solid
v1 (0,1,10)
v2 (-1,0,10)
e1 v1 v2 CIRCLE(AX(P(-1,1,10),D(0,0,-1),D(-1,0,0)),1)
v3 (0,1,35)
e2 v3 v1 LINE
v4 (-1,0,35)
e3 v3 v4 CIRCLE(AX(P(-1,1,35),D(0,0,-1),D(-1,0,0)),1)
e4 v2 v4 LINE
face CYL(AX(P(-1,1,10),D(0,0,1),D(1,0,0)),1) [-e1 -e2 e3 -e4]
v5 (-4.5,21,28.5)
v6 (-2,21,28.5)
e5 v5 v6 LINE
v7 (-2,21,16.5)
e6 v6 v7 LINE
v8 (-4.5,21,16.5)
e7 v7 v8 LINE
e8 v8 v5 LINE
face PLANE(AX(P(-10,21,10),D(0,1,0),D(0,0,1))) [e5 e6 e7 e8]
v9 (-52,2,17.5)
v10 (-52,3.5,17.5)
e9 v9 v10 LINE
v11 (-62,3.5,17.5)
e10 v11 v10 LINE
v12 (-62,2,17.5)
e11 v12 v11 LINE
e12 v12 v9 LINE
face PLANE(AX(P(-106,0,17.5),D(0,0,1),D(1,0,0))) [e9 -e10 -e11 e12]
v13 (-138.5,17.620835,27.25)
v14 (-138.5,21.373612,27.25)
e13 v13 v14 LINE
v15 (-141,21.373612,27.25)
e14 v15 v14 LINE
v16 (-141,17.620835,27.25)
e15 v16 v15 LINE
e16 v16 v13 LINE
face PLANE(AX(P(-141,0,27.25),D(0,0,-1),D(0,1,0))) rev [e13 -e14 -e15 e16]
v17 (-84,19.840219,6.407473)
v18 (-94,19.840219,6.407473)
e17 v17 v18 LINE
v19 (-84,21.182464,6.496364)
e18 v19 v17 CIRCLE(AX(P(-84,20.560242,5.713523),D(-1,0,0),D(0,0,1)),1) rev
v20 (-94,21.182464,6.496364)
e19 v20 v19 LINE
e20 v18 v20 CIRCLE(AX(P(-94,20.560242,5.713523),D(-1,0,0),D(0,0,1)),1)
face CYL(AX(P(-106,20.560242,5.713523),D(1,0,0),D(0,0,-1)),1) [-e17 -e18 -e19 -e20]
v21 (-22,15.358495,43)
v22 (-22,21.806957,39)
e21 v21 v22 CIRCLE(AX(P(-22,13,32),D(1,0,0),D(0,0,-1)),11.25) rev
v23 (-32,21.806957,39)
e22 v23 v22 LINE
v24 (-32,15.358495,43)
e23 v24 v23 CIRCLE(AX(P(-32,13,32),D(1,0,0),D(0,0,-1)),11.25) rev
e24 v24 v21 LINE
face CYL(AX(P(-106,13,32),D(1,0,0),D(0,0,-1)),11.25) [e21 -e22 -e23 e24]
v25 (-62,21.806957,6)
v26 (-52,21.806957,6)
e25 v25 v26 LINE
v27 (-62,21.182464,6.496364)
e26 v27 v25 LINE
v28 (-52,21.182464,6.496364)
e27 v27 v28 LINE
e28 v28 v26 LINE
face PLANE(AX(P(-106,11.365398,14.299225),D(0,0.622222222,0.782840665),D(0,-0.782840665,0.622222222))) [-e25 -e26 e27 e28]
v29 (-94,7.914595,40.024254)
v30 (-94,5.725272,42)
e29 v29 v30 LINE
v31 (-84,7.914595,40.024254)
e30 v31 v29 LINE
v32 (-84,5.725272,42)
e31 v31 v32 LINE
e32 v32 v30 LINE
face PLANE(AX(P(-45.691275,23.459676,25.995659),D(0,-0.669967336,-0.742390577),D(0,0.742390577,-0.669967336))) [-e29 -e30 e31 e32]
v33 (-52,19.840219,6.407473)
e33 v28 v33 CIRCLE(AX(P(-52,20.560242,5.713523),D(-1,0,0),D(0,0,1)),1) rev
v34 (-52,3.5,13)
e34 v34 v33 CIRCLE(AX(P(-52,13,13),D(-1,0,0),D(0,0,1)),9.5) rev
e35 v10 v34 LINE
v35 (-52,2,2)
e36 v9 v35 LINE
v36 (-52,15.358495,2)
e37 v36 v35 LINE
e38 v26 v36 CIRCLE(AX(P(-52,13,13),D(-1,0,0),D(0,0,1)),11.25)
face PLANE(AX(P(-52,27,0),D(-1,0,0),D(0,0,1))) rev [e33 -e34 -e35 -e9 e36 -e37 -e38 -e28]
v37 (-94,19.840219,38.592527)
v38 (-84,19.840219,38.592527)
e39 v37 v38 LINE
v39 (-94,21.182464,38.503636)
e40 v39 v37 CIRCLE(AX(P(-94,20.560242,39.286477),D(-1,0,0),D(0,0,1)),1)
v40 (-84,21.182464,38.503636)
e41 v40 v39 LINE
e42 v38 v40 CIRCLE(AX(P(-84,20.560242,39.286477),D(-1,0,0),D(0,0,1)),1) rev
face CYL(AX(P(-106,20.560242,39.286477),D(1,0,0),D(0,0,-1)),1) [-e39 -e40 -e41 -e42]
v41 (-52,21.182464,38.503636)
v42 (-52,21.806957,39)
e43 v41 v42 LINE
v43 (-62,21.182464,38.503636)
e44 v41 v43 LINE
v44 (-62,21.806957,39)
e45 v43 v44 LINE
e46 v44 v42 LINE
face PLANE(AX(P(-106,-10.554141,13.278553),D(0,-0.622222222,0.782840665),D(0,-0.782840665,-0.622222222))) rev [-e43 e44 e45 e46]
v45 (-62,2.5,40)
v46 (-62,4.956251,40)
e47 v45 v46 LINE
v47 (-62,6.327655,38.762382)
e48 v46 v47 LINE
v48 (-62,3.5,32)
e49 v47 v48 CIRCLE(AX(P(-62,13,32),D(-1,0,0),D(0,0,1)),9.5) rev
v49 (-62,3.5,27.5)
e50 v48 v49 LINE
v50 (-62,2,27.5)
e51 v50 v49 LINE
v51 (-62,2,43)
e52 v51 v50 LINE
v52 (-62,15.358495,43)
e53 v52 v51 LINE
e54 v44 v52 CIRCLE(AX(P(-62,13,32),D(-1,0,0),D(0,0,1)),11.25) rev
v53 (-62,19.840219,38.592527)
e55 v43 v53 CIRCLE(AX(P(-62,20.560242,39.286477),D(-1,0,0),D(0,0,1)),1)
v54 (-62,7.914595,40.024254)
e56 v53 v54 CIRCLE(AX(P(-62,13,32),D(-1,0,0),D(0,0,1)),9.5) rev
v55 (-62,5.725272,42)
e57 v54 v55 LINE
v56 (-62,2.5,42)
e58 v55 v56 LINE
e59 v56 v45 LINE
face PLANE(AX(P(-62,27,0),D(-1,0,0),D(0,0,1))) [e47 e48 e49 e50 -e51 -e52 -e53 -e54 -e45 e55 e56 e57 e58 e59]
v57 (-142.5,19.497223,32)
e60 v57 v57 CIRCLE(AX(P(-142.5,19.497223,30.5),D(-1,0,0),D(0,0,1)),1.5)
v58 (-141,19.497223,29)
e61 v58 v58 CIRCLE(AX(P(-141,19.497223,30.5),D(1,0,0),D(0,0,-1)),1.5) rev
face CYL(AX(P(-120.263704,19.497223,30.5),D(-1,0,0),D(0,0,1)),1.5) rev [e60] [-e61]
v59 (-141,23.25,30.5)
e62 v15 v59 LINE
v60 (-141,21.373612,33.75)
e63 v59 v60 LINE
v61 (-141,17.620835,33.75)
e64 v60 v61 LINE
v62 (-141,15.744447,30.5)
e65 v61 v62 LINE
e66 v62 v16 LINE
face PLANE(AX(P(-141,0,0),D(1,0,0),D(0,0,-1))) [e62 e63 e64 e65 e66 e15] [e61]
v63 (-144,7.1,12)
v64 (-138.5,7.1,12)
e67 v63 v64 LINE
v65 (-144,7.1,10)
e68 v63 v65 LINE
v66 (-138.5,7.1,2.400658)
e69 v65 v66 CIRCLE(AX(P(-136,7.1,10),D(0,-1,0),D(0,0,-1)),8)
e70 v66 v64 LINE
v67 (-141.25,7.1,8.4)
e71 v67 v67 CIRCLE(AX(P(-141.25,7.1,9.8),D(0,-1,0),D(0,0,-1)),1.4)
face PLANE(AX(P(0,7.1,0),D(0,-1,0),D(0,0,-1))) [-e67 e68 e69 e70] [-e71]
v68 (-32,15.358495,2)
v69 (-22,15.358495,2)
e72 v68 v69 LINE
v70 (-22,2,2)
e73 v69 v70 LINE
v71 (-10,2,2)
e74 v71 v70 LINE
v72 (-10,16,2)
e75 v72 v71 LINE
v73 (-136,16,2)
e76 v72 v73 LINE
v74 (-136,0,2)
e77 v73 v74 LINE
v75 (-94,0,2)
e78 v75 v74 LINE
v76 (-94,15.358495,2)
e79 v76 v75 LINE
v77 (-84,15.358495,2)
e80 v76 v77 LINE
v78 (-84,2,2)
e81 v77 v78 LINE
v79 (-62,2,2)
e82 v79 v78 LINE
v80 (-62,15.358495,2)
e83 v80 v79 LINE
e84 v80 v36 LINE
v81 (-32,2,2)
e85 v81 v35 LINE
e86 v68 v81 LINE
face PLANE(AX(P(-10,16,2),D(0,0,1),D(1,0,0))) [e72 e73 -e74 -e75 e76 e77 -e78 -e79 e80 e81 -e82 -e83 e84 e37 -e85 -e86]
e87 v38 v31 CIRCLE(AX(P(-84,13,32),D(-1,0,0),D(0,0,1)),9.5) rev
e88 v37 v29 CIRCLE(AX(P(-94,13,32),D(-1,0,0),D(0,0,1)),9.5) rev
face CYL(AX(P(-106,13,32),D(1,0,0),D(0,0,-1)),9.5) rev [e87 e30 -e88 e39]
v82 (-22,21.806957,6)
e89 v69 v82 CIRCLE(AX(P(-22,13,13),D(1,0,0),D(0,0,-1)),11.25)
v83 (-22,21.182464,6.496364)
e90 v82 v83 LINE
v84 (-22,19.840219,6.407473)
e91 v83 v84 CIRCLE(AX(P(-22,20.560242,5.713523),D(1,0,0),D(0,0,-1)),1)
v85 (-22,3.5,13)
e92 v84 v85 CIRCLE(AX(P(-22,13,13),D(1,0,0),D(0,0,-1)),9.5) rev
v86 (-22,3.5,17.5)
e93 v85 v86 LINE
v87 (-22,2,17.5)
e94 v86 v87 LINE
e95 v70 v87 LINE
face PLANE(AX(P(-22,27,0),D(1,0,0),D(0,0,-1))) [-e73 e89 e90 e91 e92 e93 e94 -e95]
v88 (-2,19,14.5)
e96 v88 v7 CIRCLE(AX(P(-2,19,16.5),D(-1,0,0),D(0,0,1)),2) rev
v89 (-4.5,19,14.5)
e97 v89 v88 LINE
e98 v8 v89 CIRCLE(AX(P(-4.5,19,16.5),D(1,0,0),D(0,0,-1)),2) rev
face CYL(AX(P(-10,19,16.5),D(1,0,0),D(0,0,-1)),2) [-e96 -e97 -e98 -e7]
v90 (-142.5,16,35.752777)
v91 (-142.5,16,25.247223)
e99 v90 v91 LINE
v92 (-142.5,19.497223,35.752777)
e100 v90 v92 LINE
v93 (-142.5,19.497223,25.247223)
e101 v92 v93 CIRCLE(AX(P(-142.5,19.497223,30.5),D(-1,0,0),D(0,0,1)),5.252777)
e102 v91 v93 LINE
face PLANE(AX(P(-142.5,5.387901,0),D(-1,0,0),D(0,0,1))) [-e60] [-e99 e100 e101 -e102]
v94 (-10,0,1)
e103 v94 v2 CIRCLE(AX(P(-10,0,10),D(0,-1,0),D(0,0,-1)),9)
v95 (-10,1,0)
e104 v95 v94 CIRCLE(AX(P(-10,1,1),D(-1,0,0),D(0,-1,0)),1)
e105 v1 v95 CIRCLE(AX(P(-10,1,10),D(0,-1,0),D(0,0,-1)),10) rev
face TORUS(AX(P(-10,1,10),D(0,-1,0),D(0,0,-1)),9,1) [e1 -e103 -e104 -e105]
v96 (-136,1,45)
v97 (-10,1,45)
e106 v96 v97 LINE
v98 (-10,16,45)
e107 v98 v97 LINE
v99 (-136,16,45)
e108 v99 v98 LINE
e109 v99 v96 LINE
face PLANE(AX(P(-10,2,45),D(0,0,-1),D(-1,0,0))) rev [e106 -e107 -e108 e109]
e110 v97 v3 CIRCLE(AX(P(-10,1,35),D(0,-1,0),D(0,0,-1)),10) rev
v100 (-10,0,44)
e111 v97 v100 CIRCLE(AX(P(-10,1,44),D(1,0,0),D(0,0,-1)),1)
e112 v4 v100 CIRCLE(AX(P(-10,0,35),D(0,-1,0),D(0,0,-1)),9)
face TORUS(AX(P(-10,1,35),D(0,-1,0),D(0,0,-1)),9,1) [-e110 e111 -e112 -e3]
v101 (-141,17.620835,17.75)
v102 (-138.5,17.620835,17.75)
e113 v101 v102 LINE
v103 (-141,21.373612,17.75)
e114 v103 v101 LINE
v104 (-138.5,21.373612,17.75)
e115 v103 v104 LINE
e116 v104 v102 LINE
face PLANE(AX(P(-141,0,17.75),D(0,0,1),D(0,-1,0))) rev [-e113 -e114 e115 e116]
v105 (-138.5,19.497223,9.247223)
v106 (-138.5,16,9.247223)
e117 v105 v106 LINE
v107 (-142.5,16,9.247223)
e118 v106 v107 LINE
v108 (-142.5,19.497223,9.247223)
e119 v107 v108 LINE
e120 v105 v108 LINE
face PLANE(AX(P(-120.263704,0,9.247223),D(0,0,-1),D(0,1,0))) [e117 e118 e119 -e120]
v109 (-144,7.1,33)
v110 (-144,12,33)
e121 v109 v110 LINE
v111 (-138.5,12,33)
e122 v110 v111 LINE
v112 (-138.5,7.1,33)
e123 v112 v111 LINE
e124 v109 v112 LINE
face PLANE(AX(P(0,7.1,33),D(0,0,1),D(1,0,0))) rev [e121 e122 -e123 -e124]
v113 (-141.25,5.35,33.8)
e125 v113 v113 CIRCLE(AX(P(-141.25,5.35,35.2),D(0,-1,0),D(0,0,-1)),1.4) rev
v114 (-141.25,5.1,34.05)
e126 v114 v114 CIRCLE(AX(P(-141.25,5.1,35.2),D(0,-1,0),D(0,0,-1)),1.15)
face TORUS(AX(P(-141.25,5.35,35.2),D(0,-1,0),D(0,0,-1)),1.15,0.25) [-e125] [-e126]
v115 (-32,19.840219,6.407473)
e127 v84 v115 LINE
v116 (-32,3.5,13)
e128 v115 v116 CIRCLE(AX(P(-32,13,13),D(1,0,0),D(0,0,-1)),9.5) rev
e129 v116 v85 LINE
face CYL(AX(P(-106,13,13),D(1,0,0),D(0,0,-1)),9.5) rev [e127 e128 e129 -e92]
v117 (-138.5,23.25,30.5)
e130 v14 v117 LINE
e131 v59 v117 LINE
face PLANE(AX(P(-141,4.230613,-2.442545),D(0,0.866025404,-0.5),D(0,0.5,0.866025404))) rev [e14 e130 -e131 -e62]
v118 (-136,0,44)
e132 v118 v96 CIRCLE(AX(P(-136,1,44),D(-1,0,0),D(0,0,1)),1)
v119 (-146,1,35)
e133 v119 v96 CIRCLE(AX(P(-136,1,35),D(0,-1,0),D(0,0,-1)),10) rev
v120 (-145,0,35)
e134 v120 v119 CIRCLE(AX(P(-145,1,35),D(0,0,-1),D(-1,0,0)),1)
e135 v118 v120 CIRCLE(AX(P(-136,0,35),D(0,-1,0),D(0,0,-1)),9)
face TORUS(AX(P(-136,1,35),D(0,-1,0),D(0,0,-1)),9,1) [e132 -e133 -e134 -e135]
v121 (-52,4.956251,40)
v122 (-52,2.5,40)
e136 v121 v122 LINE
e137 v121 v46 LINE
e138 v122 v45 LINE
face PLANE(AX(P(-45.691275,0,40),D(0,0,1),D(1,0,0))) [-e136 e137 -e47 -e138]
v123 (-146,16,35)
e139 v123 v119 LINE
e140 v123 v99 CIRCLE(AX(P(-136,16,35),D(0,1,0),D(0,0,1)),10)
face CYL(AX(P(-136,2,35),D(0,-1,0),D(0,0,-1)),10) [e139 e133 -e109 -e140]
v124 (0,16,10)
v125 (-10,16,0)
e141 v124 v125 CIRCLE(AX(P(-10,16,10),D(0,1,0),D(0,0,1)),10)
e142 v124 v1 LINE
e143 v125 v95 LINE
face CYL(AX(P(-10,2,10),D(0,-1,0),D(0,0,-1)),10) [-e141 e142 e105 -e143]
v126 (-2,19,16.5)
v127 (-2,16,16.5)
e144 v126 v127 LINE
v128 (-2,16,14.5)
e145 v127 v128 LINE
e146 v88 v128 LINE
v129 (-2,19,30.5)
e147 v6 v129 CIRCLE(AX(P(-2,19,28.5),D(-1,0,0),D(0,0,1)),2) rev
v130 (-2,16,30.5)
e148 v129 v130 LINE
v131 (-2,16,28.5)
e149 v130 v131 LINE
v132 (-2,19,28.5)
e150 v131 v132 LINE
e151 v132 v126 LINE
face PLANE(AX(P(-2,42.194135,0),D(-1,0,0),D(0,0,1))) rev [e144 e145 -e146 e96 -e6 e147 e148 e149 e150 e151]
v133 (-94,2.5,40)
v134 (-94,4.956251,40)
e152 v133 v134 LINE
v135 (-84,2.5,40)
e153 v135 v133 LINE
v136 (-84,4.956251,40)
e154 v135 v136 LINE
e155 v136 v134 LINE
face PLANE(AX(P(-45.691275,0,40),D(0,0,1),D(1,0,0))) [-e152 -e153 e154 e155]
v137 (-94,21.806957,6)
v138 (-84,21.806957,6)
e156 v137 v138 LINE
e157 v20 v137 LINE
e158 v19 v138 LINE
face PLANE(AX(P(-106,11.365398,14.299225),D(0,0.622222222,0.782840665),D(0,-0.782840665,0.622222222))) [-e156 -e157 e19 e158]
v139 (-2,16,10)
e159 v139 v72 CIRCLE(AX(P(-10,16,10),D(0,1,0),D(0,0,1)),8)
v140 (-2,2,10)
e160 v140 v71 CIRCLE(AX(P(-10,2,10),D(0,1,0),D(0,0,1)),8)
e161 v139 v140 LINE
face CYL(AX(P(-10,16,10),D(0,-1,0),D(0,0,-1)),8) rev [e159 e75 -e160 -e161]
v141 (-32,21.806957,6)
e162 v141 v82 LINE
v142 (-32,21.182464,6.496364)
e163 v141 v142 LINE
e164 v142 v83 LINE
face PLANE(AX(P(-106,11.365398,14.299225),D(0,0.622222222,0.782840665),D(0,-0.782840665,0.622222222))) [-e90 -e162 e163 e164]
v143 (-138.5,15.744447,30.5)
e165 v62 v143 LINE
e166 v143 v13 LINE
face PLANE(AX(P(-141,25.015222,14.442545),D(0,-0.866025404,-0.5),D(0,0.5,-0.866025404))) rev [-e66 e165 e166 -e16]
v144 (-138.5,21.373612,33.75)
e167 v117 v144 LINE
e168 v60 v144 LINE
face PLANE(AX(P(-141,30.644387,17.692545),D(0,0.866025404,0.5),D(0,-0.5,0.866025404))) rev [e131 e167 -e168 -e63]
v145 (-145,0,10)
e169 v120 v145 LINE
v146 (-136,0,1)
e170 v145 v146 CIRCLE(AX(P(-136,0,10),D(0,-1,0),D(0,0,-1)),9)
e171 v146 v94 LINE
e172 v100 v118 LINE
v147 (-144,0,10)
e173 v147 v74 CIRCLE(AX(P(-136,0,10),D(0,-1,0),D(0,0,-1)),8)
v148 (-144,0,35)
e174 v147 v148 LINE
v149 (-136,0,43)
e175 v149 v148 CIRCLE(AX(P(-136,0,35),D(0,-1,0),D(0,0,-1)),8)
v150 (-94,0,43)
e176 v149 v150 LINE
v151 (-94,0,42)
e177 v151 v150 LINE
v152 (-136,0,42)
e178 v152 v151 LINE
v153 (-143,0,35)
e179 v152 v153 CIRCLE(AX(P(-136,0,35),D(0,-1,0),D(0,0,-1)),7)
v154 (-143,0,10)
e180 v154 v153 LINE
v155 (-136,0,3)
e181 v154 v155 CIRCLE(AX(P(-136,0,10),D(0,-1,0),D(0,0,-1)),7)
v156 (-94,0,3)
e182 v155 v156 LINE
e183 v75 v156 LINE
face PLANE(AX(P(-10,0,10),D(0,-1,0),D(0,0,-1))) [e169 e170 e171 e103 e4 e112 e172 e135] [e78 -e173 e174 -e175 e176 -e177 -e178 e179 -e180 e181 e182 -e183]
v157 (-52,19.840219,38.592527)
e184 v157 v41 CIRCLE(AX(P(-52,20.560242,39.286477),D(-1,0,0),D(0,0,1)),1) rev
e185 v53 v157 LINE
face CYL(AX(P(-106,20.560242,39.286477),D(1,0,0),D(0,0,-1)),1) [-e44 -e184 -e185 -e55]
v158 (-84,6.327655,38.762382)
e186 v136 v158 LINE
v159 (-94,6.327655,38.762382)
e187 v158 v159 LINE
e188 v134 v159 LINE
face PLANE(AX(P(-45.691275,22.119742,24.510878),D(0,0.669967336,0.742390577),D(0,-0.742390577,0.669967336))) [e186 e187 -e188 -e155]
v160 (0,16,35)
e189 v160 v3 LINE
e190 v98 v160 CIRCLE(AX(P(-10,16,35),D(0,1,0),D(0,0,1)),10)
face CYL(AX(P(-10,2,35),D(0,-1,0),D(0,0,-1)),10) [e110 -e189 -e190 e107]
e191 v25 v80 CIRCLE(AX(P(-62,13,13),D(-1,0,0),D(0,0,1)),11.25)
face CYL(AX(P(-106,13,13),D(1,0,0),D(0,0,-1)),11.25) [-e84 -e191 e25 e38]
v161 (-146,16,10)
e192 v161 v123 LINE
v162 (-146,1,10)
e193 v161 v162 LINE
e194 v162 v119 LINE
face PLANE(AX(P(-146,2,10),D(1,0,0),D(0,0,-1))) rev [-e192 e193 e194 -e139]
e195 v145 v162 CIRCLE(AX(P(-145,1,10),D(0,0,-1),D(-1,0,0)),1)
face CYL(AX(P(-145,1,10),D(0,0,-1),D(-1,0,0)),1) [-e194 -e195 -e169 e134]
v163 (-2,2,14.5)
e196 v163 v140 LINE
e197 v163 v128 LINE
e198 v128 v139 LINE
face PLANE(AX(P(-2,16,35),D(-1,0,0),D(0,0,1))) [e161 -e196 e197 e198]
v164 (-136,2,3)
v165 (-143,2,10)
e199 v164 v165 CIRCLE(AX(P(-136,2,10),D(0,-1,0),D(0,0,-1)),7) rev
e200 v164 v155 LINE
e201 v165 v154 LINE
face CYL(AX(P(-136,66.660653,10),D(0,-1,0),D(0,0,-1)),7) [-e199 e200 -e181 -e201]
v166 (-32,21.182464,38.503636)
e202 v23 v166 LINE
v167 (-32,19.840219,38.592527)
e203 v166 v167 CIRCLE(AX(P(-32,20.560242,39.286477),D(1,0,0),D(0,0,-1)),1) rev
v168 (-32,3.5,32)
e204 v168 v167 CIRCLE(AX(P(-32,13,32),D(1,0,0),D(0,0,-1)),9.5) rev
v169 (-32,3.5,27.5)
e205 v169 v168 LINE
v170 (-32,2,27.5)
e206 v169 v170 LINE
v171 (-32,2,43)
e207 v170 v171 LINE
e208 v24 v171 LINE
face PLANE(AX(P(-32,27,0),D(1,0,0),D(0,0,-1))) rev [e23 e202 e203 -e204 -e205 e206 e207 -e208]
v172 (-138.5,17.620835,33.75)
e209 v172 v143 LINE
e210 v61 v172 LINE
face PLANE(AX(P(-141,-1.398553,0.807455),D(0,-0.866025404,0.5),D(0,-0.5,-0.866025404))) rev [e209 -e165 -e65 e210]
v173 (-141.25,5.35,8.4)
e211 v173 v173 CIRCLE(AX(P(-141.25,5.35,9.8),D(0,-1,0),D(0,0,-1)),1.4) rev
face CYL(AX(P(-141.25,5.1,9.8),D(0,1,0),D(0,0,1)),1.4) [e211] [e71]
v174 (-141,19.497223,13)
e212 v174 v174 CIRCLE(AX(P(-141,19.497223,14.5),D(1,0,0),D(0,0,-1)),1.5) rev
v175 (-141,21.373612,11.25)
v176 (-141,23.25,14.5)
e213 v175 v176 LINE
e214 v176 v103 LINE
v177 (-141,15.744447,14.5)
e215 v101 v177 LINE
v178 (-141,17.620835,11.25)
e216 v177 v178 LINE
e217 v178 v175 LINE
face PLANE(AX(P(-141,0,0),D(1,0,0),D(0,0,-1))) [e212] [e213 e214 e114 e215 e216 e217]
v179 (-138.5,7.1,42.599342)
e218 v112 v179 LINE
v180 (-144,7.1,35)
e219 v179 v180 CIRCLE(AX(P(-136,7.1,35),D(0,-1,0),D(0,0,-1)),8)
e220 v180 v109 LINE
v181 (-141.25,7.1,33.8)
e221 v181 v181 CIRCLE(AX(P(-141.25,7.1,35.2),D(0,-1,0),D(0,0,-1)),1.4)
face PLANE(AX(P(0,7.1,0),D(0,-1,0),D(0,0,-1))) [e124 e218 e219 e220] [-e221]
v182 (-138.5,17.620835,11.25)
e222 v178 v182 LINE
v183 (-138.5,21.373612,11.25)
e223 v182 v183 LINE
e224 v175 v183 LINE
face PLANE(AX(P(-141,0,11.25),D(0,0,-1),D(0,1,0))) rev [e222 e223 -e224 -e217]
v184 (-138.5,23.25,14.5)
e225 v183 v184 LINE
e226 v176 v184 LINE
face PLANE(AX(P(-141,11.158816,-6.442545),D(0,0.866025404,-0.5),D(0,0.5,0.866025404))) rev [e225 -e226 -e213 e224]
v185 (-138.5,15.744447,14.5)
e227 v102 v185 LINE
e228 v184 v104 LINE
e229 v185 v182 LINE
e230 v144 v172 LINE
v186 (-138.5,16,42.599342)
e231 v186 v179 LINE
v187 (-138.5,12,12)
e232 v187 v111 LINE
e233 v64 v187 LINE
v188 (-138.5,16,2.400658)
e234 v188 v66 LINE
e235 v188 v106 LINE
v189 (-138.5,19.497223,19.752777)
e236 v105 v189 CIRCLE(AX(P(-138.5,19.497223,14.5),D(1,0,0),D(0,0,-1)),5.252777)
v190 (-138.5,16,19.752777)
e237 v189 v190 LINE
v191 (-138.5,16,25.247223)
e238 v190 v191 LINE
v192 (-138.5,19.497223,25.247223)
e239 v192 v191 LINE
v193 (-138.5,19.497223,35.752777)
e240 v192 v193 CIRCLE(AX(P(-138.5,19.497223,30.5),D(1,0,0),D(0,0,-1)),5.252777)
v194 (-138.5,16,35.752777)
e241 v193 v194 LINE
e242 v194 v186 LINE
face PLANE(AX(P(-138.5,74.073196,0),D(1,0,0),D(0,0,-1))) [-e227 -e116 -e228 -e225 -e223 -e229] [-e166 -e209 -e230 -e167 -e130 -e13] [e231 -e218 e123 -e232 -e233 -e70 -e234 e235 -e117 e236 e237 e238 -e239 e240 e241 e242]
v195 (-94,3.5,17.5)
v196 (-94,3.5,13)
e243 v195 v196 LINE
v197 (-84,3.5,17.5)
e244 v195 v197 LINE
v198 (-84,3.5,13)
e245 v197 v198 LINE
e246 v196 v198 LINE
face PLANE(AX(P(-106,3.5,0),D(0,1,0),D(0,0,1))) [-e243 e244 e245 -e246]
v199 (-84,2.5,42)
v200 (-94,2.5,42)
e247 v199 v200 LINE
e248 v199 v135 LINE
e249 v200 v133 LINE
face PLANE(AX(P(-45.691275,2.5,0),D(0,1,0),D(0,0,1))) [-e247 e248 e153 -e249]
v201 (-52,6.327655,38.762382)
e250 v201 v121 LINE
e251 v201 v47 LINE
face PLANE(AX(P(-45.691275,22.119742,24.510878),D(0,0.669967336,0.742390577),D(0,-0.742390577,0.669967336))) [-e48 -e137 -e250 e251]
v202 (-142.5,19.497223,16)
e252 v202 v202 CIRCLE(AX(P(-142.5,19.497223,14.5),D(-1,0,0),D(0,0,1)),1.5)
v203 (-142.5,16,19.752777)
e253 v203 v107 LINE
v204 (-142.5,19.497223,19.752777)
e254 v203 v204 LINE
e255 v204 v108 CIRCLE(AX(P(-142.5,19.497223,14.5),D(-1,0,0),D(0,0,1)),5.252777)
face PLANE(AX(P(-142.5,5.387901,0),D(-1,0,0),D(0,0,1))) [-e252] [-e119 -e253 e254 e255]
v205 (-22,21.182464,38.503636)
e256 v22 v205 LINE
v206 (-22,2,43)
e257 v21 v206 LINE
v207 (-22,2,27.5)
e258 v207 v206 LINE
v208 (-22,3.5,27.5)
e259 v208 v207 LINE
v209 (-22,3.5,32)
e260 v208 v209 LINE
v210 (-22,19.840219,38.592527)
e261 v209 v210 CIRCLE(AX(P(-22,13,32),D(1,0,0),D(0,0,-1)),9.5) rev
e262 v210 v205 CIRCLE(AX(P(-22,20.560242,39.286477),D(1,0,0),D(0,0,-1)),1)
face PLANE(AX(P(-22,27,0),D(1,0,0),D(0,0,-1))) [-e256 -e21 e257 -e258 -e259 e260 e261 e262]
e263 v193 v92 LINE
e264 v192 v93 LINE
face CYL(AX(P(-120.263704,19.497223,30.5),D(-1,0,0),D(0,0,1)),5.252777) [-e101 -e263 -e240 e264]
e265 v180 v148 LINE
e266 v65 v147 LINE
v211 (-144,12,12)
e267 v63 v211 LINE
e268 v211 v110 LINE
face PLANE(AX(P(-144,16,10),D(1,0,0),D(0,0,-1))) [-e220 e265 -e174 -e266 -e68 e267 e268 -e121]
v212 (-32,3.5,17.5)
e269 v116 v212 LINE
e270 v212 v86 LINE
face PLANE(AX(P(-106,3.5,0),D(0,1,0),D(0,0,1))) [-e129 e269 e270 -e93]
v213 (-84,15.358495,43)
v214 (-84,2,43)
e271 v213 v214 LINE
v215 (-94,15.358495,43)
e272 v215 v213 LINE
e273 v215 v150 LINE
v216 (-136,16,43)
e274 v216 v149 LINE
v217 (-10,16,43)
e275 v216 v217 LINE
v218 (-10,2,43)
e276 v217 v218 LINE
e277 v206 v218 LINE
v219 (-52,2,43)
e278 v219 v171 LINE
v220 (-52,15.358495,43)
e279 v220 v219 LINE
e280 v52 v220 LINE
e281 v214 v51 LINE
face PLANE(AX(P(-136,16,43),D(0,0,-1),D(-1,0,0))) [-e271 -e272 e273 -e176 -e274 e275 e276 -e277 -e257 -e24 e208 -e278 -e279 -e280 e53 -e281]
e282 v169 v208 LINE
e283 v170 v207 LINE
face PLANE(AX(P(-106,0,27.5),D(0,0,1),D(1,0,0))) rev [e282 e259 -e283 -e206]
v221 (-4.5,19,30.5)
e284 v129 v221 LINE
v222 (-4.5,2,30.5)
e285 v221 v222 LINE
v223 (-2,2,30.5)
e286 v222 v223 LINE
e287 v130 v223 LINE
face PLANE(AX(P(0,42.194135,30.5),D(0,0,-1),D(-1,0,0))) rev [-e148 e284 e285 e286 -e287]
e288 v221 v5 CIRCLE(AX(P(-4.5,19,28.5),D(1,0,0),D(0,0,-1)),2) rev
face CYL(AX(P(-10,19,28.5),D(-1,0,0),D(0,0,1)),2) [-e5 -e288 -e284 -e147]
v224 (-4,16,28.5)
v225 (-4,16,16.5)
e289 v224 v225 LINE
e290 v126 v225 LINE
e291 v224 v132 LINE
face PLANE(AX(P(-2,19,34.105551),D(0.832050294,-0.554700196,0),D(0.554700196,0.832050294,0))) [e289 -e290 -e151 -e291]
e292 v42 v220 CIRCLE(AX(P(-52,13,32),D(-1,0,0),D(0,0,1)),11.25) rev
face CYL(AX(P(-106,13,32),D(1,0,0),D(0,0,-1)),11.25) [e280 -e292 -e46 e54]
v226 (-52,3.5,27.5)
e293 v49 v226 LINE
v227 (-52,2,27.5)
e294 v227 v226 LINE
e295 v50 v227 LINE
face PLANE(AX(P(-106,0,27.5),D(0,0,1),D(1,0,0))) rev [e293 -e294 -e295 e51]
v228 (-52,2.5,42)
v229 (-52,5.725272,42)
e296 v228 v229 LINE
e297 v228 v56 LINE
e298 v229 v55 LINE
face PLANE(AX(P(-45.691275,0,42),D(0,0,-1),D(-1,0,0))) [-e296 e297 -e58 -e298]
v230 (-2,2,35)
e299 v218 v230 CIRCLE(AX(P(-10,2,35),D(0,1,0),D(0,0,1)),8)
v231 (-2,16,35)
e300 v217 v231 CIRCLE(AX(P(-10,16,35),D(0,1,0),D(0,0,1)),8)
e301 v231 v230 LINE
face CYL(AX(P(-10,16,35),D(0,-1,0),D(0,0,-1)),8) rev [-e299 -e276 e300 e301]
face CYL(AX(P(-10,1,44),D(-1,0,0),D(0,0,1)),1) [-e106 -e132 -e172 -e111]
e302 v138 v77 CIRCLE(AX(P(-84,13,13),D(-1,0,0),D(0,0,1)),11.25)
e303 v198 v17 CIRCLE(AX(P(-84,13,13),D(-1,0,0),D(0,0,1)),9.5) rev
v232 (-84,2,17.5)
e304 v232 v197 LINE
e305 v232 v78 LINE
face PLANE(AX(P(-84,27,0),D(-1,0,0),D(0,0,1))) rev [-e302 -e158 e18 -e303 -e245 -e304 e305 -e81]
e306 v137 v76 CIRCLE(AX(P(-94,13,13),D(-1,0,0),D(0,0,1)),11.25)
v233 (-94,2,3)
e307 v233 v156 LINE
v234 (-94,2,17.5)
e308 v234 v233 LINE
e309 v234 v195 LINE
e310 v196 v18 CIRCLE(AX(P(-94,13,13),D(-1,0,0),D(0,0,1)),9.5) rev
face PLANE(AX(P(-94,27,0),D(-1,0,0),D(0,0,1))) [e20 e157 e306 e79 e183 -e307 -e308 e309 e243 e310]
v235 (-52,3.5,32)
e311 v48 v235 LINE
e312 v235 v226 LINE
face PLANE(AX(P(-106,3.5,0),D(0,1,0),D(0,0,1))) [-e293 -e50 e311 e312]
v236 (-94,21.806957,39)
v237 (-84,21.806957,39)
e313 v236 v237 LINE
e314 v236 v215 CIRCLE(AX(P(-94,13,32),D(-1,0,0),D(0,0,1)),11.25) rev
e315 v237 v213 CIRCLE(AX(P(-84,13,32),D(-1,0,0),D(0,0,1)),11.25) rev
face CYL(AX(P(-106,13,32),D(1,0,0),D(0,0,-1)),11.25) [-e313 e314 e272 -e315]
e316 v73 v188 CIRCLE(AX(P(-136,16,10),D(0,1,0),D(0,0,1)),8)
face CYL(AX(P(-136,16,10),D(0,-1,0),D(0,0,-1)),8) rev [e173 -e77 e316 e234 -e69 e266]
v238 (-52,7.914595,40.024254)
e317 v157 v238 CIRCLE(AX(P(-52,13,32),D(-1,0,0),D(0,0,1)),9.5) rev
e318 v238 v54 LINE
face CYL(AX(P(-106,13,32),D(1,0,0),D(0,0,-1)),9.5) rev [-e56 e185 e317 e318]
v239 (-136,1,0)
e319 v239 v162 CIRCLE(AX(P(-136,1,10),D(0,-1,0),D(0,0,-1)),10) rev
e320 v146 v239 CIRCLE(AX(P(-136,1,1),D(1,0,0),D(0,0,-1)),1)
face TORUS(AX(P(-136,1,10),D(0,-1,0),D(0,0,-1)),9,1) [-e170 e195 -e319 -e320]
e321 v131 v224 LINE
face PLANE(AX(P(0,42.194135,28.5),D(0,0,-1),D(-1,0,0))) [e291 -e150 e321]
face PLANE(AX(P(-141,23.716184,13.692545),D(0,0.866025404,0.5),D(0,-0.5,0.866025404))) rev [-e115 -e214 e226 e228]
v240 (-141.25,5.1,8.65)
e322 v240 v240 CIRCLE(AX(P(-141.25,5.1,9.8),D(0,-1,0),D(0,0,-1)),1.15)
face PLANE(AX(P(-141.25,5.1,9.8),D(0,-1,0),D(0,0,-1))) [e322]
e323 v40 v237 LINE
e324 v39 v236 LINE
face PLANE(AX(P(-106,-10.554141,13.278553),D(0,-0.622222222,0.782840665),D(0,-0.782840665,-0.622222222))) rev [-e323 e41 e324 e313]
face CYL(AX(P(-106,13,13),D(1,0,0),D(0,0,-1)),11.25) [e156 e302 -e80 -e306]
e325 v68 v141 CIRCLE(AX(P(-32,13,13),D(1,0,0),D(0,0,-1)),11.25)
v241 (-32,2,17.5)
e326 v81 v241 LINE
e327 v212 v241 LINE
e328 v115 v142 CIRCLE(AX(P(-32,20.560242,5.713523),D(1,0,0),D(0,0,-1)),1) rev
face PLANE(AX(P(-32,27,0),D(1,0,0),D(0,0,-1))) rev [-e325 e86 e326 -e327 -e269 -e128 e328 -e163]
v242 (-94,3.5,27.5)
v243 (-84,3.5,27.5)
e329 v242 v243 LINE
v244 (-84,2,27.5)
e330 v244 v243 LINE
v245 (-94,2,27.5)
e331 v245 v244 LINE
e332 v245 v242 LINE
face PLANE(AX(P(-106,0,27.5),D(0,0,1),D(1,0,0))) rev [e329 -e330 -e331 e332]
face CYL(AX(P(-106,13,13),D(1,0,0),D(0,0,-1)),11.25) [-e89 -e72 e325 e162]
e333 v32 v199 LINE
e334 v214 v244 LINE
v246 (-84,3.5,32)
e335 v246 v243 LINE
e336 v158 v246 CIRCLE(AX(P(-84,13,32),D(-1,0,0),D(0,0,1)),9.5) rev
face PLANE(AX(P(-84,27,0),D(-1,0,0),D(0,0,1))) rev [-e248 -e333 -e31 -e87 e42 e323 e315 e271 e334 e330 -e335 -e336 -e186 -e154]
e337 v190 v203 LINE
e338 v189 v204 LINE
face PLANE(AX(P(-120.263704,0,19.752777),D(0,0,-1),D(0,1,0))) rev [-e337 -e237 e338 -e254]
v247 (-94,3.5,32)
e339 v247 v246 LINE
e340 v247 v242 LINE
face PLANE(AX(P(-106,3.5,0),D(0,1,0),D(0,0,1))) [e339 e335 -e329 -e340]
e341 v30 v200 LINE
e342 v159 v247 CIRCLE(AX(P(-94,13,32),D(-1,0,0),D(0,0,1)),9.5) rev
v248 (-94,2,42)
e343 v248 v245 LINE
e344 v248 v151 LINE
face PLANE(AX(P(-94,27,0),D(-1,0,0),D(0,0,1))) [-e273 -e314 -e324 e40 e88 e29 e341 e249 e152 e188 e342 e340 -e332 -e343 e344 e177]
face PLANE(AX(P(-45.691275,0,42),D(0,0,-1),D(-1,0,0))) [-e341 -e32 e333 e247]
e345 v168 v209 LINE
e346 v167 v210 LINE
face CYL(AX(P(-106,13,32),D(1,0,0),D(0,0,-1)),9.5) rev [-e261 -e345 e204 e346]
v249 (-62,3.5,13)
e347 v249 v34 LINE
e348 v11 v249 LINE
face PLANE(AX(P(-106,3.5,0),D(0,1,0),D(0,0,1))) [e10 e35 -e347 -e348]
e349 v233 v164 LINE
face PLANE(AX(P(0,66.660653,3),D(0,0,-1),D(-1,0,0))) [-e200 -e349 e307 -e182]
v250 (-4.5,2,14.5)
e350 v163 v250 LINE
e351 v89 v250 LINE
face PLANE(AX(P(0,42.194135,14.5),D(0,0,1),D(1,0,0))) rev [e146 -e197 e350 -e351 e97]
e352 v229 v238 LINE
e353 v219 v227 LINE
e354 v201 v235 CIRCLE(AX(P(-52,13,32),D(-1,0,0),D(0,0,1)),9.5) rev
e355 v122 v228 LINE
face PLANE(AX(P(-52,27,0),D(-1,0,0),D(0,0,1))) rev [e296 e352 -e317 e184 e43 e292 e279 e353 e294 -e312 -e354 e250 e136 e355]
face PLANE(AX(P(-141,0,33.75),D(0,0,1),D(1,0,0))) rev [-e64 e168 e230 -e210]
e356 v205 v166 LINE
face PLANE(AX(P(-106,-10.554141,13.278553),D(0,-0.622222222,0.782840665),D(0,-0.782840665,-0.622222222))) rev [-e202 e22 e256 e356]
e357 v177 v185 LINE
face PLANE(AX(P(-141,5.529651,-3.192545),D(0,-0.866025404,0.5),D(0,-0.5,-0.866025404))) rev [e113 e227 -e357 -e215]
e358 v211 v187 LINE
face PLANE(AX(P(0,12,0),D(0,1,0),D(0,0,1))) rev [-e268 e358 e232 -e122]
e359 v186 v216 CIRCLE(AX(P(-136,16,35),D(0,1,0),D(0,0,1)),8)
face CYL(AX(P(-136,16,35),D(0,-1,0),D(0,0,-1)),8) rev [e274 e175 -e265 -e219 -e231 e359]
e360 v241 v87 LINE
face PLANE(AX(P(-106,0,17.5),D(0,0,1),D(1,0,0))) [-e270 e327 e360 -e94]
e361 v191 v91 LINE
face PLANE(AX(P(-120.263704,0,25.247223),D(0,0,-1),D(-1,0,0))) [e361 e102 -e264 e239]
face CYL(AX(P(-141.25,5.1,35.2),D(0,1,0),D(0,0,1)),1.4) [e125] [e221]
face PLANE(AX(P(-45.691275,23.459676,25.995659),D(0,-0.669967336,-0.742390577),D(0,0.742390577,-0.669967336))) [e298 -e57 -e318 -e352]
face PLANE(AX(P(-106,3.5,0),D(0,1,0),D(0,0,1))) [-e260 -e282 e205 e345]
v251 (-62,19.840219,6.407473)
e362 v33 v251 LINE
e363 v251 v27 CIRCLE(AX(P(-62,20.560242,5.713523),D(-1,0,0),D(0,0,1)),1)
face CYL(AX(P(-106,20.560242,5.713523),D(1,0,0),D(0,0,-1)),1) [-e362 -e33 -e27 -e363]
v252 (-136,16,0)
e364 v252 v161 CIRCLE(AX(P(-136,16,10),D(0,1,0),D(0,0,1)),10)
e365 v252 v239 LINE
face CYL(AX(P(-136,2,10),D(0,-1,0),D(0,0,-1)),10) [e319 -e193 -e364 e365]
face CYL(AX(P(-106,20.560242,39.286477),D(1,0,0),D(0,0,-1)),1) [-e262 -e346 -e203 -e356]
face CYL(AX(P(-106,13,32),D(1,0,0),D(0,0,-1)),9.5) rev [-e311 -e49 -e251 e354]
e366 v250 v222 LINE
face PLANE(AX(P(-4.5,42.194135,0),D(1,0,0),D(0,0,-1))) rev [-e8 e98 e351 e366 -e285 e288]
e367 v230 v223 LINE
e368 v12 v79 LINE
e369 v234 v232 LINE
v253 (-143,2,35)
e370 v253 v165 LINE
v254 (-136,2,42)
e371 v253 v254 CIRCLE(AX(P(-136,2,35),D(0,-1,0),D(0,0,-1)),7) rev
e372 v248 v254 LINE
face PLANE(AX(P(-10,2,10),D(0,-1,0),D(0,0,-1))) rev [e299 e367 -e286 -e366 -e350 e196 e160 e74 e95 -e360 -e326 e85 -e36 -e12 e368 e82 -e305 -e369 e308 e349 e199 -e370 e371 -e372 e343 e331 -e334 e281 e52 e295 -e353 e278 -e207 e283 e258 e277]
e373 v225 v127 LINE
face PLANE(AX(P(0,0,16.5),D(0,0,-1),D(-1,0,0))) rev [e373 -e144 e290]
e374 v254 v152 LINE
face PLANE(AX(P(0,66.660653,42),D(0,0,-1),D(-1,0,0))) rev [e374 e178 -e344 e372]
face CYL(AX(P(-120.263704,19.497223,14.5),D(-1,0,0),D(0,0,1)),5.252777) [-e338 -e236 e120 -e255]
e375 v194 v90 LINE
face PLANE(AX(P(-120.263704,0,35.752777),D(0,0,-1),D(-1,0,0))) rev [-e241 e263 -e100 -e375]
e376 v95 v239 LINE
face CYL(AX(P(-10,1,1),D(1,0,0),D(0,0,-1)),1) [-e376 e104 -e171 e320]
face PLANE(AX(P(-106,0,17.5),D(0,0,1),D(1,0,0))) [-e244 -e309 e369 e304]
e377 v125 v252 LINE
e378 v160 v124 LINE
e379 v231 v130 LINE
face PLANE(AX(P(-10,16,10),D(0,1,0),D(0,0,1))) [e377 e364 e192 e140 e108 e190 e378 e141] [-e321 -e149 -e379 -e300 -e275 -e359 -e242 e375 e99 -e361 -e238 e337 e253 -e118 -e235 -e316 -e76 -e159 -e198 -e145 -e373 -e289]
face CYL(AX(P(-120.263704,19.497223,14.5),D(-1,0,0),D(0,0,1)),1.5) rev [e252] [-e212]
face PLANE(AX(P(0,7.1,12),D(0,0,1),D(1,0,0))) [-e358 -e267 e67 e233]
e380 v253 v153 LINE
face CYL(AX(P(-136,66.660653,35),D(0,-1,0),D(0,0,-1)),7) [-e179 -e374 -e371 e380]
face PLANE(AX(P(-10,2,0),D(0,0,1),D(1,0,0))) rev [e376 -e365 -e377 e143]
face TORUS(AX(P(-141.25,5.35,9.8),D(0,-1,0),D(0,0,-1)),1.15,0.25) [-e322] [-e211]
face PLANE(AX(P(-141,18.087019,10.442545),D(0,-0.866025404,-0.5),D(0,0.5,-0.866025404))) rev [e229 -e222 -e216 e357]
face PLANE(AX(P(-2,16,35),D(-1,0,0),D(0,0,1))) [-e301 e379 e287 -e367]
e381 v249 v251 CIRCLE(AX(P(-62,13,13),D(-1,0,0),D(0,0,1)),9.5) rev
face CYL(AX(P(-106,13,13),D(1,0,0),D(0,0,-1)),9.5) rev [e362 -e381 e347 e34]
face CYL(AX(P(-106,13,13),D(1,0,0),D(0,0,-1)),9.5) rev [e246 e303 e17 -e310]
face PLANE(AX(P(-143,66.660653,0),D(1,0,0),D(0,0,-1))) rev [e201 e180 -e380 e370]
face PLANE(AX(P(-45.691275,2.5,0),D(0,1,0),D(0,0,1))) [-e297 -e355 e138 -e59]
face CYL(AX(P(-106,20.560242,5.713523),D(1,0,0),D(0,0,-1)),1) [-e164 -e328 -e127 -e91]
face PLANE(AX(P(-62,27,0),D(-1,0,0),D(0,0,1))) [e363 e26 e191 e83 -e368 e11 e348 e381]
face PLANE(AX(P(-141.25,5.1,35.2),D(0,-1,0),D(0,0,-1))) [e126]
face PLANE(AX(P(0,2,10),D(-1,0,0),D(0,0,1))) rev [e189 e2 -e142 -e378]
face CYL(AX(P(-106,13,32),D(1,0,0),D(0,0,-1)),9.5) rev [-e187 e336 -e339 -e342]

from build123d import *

# Parameters (mm, degrees)
BOSS_EXTRUDE1_DEPTH    = 2
BOSS_EXTRUDE2_DEPTH    = 14
FILLET1_R              = 1
SKETCH3_W              = 10
SKETCH3_H              = 41
BOSS_EXTRUDE3_DEPTH    = 25
BOSS_EXTRUDE5_DEPTH    = 12.75
CUT_EXTRUDE3_DEPTH     = 2.5
CUT_EXTRUDE5_OUTLINE_R = 1.5
CUT_EXTRUDE5_DEPTH     = 5.5
SKETCH10_W             = 2.5
SKETCH10_H             = 16
BOSS_EXTRUDE6_DEPTH    = 19
CUT_EXTRUDE6_DEPTH     = 12
FILLET2_R              = 2
CUT_EXTRUDE7_START     = -8.75
CUT_EXTRUDE7_DEPTH     = 8.75
CUT_EXTRUDE13_DEPTH    = 84
CUT_EXTRUDE15_DEPTH    = 2
BOSS_EXTRUDE7_START    = 4.9
BOSS_EXTRUDE7_DEPTH    = 4.9
SKETCH17_R             = 1.4
BOSS_EXTRUDE8_DEPTH    = 2
FILLET3_R              = 0.25
CUT_EXTRUDE16_START    = -42
CUT_EXTRUDE16_DEPTH    = 42
FILLET4_R              = 1


# Read off the part's stored shape, not the designer's step: Cut-Extrude5
with BuildPart() as part:
    # Sketch1 → Boss-Extrude1 (new body)
    with BuildSketch(Plane(origin=(0, 0, 0), x_dir=(1, 0, 0), z_dir=(0, 1, 0))):
        with BuildLine():
            Line((-10, 0), (-136, 0))
            ThreePointArc((-136, 0), (-143.071067812, -2.928932188), (-146, -10))
            Line((-146, -10), (-146, -35))
            ThreePointArc((-146, -35), (-143.071067812, -42.071067812), (-136, -45))
            Line((-136, -45), (-10, -45))
            ThreePointArc((-10, -45), (-2.928932188, -42.071067812), (0, -35))
            Line((0, -35), (0, -10))
            ThreePointArc((0, -10), (-2.928932188, -2.928932188), (-10, 0))
        make_face()
    extrude(amount=BOSS_EXTRUDE1_DEPTH)

    # Sketch2 → Boss-Extrude2 (add)
    with BuildSketch(Plane(origin=(0, 2, 0), x_dir=(1, 0, 0), z_dir=(0, 1, 0))):
        with BuildLine():
            Line((-10, 0), (-136, 0))
            ThreePointArc((-136, 0), (-143.071067812, -2.928932188), (-146, -10))
            Line((-146, -10), (-146, -35))
            ThreePointArc((-146, -35), (-143.071067812, -42.071067812), (-136, -45))
            Line((-136, -45), (-10, -45))
            ThreePointArc((-10, -45), (-2.928932188, -42.071067812), (0, -35))
            Line((0, -35), (0, -10))
            ThreePointArc((0, -10), (-2.928932188, -2.928932188), (-10, 0))
        make_face()
        with BuildLine():
            Line((-10, -2), (-136, -2))
            ThreePointArc((-136, -2), (-141.656854249, -4.343145751), (-144, -10))
            Line((-144, -10), (-144, -35))
            ThreePointArc((-144, -35), (-141.656854249, -40.656854249), (-136, -43))
            Line((-136, -43), (-10, -43))
            ThreePointArc((-10, -43), (-4.343145751, -40.656854249), (-2, -35))
            Line((-2, -35), (-2, -10))
            ThreePointArc((-2, -10), (-4.343145751, -4.343145751), (-10, -2))
        make_face(mode=Mode.SUBTRACT)
    extrude(amount=BOSS_EXTRUDE2_DEPTH)

    # Fillet1
    fillet1_edges = [part.edges().sort_by_distance(p)[0] for p in [
        (-73, 0, 0),
        (-2.928932188, 0, 2.928932188),
        (0, 0, 22.5),
        (-2.928932188, 0, 42.071067812),
        (-73, 0, 45),
        (-143.071067812, 0, 42.071067812),
        (-146, 0, 22.5),
        (-143.071067812, 0, 2.928932188),
    ]]
    fillet(fillet1_edges, radius=FILLET1_R)

    # Sketch3 → Boss-Extrude3 (add)
    with BuildSketch(Plane(origin=(0, 2, 0), x_dir=(1, 0, 0), z_dir=(0, 1, 0))):
        with Locations((-57, -22.5)):
            Rectangle(SKETCH3_W, SKETCH3_H)
        with Locations((-89, -22.5)):
            Rectangle(SKETCH3_W, SKETCH3_H)
        with Locations((-27, -22.5)):
            Rectangle(SKETCH3_W, SKETCH3_H)
    extrude(amount=BOSS_EXTRUDE3_DEPTH)

    # Sketch7 → Boss-Extrude5 (add)
    with BuildSketch(Plane(origin=(0, 12, 0), x_dir=(1, 0, 0), z_dir=(0, 1, 0))):
        with BuildLine():
            ThreePointArc((-138.5, -2.400657923), (-142.480740698, -5.30958424), (-144, -10))
            Line((-144, -10), (-144, -35))
            ThreePointArc((-144, -35), (-142.480740698, -39.69041576), (-138.5, -42.599342077))
            Line((-138.5, -42.599342077), (-138.5, -2.400657923))
        make_face()
    extrude(amount=BOSS_EXTRUDE5_DEPTH)

    # Sketch8 → Cut-Extrude3 (cut)
    with BuildSketch(Plane(origin=(-138.5, 0, 0), x_dir=(0, 0, -1), z_dir=(1, 0, 0))):
        Polygon((-27.25, 17.620834875), (-27.25, 21.373611625), (-30.5, 23.25), (-33.75, 21.373611625), (-33.75, 17.620834875), (-30.5, 15.744446501), align=None)
        Polygon((-11.25, 17.620834875), (-11.25, 21.373611625), (-14.5, 23.25), (-17.75, 21.373611625), (-17.75, 17.620834875), (-14.5, 15.744446501), align=None)
    extrude(amount=-CUT_EXTRUDE3_DEPTH, mode=Mode.SUBTRACT)

    # Cut-Extrude5 outline → Cut-Extrude5 (cut)
    with BuildSketch(Plane(origin=(-144, 0, 0), x_dir=(0, 0, -1), z_dir=(1, 0, 0))):
        with BuildLine():
            Line((-2.400657923, 24.75), (-14.500000003, 24.75))
            ThreePointArc((-14.500000003, 24.75), (-10.785725941, 23.211497311), (-9.24722325, 19.49722325))
            Line((-9.24722325, 19.49722325), (-9.24722325, 16))
            Line((-9.24722325, 16), (-2.400657923, 16))
            Line((-2.400657923, 16), (-2.400657923, 24.75))
        make_face()
        with BuildLine():
            ThreePointArc((-19.75277675, 19.49722325), (-18.214274061, 23.211497309), (-14.500000003, 24.75))
            Line((-14.500000003, 24.75), (-30.49999999, 24.75))
            ThreePointArc((-30.49999999, 24.75), (-26.785725937, 23.211497307), (-25.24722325, 19.49722325))
            Line((-25.24722325, 19.49722325), (-25.24722325, 16))
            Line((-25.24722325, 16), (-19.75277675, 16))
            Line((-19.75277675, 16), (-19.75277675, 19.49722325))
        make_face()
        with BuildLine():
            ThreePointArc((-35.75277675, 19.49722325), (-34.214274056, 23.211497313), (-30.49999999, 24.75))
            Line((-30.49999999, 24.75), (-42.599342077, 24.75))
            Line((-42.599342077, 24.75), (-42.599342077, 16))
            Line((-42.599342077, 16), (-35.75277675, 16))
            Line((-35.75277675, 16), (-35.75277675, 19.49722325))
        make_face()
        with Locations((-14.5, 19.49722325)):
            Circle(CUT_EXTRUDE5_OUTLINE_R)
        with Locations((-30.5, 19.49722325)):
            Circle(CUT_EXTRUDE5_OUTLINE_R)
    extrude(amount=CUT_EXTRUDE5_DEPTH, mode=Mode.SUBTRACT)

    # Sketch10 → Boss-Extrude6 (add)
    with BuildSketch(Plane(origin=(0, 2, 0), x_dir=(1, 0, 0), z_dir=(0, 1, 0))):
        with Locations((-3.25, -22.5)):
            Rectangle(SKETCH10_W, SKETCH10_H)
    extrude(amount=BOSS_EXTRUDE6_DEPTH)

    # Sketch11 → Cut-Extrude6 (cut)
    with BuildSketch(Plane(origin=(0, 0, 16.5), x_dir=(-1, 0, 0), z_dir=(0, 0, -1))):
        Polygon((2, 19), (4, 16), (2, 16), align=None)
    extrude(amount=-CUT_EXTRUDE6_DEPTH, mode=Mode.SUBTRACT)

    # Fillet2
    fillet2_edges = [part.edges().sort_by_distance(p)[0] for p in [
        (-3.25, 21, 14.5),
        (-3.25, 21, 30.5),
    ]]
    fillet(fillet2_edges, radius=FILLET2_R)

    # Sketch12 → Cut-Extrude7 (cut)
    with BuildSketch(Plane(origin=(0, 24.75, 0), x_dir=(1, 0, 0), z_dir=(0, 1, 0)).offset(CUT_EXTRUDE7_START)):
        with BuildLine():
            ThreePointArc((-143.964504201, -9.24722325), (-143.991121123, -9.623193423), (-144, -10))
            Line((-144, -10), (-144, -19.75277675))
            Line((-144, -19.75277675), (-142.5, -19.75277675))
            Line((-142.5, -19.75277675), (-142.5, -9.24722325))
            Line((-142.5, -9.24722325), (-143.964504201, -9.24722325))
        make_face()
        with BuildLine():
            ThreePointArc((-144, -35), (-143.991121123, -35.376806577), (-143.964504201, -35.75277675))
            Line((-143.964504201, -35.75277675), (-142.5, -35.75277675))
            Line((-142.5, -35.75277675), (-142.5, -25.24722325))
            Line((-142.5, -25.24722325), (-144, -25.24722325))
            Line((-144, -25.24722325), (-144, -35))
        make_face()
    extrude(amount=CUT_EXTRUDE7_DEPTH, mode=Mode.SUBTRACT)

    # Sketch4 → Cut-Extrude13 (cut)
    with BuildSketch(Plane.ZY.offset(22)):
        with BuildLine():
            Line((6, 21.806957477), (7.088888889, 20.436986314))
            ThreePointArc((7.088888889, 20.436986314), (4.030569417, 9.86961424), (13, 3.5))
            Line((13, 3.5), (17.5, 3.5))
            Line((17.5, 3.5), (17.5, 2))
            Line((17.5, 2), (27.5, 2))
            Line((27.5, 2), (27.5, 3.5))
            Line((27.5, 3.5), (32, 3.5))
            ThreePointArc((32, 3.5), (40.969430583, 9.86961424), (37.911111111, 20.436986314))
            Line((37.911111111, 20.436986314), (39, 21.806957477))
            ThreePointArc((39, 21.806957477), (41.560108062, 18.930163053), (43, 15.358495283))
            Line((43, 15.358495283), (43, 27))
            Line((43, 27), (2, 27))
            Line((2, 27), (2, 15.358495283))
            ThreePointArc((2, 15.358495283), (3.439891938, 18.930163053), (6, 21.806957477))
        make_face()
    extrude(amount=CUT_EXTRUDE13_DEPTH, mode=Mode.SUBTRACT)

    # Sketch15 → Cut-Extrude15 (cut)
    with BuildSketch(Plane.XZ):
        with BuildLine():
            Line((-136, 2), (-94, 2))
            Line((-94, 2), (-94, 3))
            Line((-94, 3), (-95, 3))
            Line((-95, 3), (-136, 3))
            ThreePointArc((-136, 3), (-140.949747468, 5.050252532), (-143, 10))
            Line((-143, 10), (-143, 35))
            ThreePointArc((-143, 35), (-140.949747468, 39.949747468), (-136, 42))
            Line((-136, 42), (-95, 42))
            Line((-95, 42), (-94, 42))
            Line((-94, 42), (-94, 43))
            Line((-94, 43), (-136, 43))
            ThreePointArc((-136, 43), (-141.656854249, 40.656854249), (-144, 35))
            Line((-144, 35), (-144, 10))
            ThreePointArc((-144, 10), (-141.656854249, 4.343145751), (-136, 2))
        make_face()
    extrude(amount=-CUT_EXTRUDE15_DEPTH, mode=Mode.SUBTRACT)

    # Sketch16 → Boss-Extrude7 (add)
    with BuildSketch(Plane.XZ.offset(-12).offset(BOSS_EXTRUDE7_START)):
        with BuildLine():
            Line((-144, 35), (-144, 33))
            Line((-144, 33), (-138.5, 33))
            Line((-138.5, 33), (-138.5, 42.599342077))
            ThreePointArc((-138.5, 42.599342077), (-142.480740698, 39.69041576), (-144, 35))
        make_face()
        with BuildLine():
            Line((-138.5, 12), (-144, 12))
            Line((-144, 12), (-144, 10))
            ThreePointArc((-144, 10), (-142.480740698, 5.30958424), (-138.5, 2.400657923))
            Line((-138.5, 2.400657923), (-138.5, 12))
        make_face()
    extrude(amount=-BOSS_EXTRUDE7_DEPTH)

    # Sketch17 → Boss-Extrude8 (add)
    with BuildSketch(Plane.XZ.offset(-7.1)):
        with Locations(Location((-141.25, 35.2, 0), (0, 0, 270))):
            Circle(SKETCH17_R)
        with Locations(Location((-141.25, 9.8, 0), (0, 0, 270))):
            Circle(SKETCH17_R)
    extrude(amount=BOSS_EXTRUDE8_DEPTH)

    # Fillet3
    fillet3_edges = [part.edges().sort_by_distance(p)[0] for p in [
        (-141.25, 5.1, 36.6),
        (-141.25, 5.1, 11.2),
    ]]
    fillet(fillet3_edges, radius=FILLET3_R)

    # Sketch19 → Cut-Extrude16 (cut)
    with BuildSketch(Plane.ZY.offset(94).offset(CUT_EXTRUDE16_START)):
        with BuildLine():
            Line((42, 5.72527161), (40.024254166, 7.914594894))
            ThreePointArc((40.024254166, 7.914594894), (39.435774802, 7.087364962), (38.762381995, 6.327654854))
            Line((38.762381995, 6.327654854), (40, 4.956250765))
            Line((40, 4.956250765), (40, 2.5))
            Line((40, 2.5), (42, 2.5))
            Line((42, 2.5), (42, 5.72527161))
        make_face()
    extrude(amount=CUT_EXTRUDE16_DEPTH, mode=Mode.SUBTRACT)

    # Fillet4
    fillet4_edges = [part.edges().sort_by_distance(p)[0] for p in [
        (-57, 20.436986314, 7.088888889),
        (-89, 20.436986314, 7.088888889),
        (-27, 20.436986314, 7.088888889),
        (-57, 20.436986314, 37.911111111),
        (-89, 20.436986314, 37.911111111),
        (-27, 20.436986314, 37.911111111),
    ]]
    fillet(fillet4_edges, radius=FILLET4_R)


solid = part.part
